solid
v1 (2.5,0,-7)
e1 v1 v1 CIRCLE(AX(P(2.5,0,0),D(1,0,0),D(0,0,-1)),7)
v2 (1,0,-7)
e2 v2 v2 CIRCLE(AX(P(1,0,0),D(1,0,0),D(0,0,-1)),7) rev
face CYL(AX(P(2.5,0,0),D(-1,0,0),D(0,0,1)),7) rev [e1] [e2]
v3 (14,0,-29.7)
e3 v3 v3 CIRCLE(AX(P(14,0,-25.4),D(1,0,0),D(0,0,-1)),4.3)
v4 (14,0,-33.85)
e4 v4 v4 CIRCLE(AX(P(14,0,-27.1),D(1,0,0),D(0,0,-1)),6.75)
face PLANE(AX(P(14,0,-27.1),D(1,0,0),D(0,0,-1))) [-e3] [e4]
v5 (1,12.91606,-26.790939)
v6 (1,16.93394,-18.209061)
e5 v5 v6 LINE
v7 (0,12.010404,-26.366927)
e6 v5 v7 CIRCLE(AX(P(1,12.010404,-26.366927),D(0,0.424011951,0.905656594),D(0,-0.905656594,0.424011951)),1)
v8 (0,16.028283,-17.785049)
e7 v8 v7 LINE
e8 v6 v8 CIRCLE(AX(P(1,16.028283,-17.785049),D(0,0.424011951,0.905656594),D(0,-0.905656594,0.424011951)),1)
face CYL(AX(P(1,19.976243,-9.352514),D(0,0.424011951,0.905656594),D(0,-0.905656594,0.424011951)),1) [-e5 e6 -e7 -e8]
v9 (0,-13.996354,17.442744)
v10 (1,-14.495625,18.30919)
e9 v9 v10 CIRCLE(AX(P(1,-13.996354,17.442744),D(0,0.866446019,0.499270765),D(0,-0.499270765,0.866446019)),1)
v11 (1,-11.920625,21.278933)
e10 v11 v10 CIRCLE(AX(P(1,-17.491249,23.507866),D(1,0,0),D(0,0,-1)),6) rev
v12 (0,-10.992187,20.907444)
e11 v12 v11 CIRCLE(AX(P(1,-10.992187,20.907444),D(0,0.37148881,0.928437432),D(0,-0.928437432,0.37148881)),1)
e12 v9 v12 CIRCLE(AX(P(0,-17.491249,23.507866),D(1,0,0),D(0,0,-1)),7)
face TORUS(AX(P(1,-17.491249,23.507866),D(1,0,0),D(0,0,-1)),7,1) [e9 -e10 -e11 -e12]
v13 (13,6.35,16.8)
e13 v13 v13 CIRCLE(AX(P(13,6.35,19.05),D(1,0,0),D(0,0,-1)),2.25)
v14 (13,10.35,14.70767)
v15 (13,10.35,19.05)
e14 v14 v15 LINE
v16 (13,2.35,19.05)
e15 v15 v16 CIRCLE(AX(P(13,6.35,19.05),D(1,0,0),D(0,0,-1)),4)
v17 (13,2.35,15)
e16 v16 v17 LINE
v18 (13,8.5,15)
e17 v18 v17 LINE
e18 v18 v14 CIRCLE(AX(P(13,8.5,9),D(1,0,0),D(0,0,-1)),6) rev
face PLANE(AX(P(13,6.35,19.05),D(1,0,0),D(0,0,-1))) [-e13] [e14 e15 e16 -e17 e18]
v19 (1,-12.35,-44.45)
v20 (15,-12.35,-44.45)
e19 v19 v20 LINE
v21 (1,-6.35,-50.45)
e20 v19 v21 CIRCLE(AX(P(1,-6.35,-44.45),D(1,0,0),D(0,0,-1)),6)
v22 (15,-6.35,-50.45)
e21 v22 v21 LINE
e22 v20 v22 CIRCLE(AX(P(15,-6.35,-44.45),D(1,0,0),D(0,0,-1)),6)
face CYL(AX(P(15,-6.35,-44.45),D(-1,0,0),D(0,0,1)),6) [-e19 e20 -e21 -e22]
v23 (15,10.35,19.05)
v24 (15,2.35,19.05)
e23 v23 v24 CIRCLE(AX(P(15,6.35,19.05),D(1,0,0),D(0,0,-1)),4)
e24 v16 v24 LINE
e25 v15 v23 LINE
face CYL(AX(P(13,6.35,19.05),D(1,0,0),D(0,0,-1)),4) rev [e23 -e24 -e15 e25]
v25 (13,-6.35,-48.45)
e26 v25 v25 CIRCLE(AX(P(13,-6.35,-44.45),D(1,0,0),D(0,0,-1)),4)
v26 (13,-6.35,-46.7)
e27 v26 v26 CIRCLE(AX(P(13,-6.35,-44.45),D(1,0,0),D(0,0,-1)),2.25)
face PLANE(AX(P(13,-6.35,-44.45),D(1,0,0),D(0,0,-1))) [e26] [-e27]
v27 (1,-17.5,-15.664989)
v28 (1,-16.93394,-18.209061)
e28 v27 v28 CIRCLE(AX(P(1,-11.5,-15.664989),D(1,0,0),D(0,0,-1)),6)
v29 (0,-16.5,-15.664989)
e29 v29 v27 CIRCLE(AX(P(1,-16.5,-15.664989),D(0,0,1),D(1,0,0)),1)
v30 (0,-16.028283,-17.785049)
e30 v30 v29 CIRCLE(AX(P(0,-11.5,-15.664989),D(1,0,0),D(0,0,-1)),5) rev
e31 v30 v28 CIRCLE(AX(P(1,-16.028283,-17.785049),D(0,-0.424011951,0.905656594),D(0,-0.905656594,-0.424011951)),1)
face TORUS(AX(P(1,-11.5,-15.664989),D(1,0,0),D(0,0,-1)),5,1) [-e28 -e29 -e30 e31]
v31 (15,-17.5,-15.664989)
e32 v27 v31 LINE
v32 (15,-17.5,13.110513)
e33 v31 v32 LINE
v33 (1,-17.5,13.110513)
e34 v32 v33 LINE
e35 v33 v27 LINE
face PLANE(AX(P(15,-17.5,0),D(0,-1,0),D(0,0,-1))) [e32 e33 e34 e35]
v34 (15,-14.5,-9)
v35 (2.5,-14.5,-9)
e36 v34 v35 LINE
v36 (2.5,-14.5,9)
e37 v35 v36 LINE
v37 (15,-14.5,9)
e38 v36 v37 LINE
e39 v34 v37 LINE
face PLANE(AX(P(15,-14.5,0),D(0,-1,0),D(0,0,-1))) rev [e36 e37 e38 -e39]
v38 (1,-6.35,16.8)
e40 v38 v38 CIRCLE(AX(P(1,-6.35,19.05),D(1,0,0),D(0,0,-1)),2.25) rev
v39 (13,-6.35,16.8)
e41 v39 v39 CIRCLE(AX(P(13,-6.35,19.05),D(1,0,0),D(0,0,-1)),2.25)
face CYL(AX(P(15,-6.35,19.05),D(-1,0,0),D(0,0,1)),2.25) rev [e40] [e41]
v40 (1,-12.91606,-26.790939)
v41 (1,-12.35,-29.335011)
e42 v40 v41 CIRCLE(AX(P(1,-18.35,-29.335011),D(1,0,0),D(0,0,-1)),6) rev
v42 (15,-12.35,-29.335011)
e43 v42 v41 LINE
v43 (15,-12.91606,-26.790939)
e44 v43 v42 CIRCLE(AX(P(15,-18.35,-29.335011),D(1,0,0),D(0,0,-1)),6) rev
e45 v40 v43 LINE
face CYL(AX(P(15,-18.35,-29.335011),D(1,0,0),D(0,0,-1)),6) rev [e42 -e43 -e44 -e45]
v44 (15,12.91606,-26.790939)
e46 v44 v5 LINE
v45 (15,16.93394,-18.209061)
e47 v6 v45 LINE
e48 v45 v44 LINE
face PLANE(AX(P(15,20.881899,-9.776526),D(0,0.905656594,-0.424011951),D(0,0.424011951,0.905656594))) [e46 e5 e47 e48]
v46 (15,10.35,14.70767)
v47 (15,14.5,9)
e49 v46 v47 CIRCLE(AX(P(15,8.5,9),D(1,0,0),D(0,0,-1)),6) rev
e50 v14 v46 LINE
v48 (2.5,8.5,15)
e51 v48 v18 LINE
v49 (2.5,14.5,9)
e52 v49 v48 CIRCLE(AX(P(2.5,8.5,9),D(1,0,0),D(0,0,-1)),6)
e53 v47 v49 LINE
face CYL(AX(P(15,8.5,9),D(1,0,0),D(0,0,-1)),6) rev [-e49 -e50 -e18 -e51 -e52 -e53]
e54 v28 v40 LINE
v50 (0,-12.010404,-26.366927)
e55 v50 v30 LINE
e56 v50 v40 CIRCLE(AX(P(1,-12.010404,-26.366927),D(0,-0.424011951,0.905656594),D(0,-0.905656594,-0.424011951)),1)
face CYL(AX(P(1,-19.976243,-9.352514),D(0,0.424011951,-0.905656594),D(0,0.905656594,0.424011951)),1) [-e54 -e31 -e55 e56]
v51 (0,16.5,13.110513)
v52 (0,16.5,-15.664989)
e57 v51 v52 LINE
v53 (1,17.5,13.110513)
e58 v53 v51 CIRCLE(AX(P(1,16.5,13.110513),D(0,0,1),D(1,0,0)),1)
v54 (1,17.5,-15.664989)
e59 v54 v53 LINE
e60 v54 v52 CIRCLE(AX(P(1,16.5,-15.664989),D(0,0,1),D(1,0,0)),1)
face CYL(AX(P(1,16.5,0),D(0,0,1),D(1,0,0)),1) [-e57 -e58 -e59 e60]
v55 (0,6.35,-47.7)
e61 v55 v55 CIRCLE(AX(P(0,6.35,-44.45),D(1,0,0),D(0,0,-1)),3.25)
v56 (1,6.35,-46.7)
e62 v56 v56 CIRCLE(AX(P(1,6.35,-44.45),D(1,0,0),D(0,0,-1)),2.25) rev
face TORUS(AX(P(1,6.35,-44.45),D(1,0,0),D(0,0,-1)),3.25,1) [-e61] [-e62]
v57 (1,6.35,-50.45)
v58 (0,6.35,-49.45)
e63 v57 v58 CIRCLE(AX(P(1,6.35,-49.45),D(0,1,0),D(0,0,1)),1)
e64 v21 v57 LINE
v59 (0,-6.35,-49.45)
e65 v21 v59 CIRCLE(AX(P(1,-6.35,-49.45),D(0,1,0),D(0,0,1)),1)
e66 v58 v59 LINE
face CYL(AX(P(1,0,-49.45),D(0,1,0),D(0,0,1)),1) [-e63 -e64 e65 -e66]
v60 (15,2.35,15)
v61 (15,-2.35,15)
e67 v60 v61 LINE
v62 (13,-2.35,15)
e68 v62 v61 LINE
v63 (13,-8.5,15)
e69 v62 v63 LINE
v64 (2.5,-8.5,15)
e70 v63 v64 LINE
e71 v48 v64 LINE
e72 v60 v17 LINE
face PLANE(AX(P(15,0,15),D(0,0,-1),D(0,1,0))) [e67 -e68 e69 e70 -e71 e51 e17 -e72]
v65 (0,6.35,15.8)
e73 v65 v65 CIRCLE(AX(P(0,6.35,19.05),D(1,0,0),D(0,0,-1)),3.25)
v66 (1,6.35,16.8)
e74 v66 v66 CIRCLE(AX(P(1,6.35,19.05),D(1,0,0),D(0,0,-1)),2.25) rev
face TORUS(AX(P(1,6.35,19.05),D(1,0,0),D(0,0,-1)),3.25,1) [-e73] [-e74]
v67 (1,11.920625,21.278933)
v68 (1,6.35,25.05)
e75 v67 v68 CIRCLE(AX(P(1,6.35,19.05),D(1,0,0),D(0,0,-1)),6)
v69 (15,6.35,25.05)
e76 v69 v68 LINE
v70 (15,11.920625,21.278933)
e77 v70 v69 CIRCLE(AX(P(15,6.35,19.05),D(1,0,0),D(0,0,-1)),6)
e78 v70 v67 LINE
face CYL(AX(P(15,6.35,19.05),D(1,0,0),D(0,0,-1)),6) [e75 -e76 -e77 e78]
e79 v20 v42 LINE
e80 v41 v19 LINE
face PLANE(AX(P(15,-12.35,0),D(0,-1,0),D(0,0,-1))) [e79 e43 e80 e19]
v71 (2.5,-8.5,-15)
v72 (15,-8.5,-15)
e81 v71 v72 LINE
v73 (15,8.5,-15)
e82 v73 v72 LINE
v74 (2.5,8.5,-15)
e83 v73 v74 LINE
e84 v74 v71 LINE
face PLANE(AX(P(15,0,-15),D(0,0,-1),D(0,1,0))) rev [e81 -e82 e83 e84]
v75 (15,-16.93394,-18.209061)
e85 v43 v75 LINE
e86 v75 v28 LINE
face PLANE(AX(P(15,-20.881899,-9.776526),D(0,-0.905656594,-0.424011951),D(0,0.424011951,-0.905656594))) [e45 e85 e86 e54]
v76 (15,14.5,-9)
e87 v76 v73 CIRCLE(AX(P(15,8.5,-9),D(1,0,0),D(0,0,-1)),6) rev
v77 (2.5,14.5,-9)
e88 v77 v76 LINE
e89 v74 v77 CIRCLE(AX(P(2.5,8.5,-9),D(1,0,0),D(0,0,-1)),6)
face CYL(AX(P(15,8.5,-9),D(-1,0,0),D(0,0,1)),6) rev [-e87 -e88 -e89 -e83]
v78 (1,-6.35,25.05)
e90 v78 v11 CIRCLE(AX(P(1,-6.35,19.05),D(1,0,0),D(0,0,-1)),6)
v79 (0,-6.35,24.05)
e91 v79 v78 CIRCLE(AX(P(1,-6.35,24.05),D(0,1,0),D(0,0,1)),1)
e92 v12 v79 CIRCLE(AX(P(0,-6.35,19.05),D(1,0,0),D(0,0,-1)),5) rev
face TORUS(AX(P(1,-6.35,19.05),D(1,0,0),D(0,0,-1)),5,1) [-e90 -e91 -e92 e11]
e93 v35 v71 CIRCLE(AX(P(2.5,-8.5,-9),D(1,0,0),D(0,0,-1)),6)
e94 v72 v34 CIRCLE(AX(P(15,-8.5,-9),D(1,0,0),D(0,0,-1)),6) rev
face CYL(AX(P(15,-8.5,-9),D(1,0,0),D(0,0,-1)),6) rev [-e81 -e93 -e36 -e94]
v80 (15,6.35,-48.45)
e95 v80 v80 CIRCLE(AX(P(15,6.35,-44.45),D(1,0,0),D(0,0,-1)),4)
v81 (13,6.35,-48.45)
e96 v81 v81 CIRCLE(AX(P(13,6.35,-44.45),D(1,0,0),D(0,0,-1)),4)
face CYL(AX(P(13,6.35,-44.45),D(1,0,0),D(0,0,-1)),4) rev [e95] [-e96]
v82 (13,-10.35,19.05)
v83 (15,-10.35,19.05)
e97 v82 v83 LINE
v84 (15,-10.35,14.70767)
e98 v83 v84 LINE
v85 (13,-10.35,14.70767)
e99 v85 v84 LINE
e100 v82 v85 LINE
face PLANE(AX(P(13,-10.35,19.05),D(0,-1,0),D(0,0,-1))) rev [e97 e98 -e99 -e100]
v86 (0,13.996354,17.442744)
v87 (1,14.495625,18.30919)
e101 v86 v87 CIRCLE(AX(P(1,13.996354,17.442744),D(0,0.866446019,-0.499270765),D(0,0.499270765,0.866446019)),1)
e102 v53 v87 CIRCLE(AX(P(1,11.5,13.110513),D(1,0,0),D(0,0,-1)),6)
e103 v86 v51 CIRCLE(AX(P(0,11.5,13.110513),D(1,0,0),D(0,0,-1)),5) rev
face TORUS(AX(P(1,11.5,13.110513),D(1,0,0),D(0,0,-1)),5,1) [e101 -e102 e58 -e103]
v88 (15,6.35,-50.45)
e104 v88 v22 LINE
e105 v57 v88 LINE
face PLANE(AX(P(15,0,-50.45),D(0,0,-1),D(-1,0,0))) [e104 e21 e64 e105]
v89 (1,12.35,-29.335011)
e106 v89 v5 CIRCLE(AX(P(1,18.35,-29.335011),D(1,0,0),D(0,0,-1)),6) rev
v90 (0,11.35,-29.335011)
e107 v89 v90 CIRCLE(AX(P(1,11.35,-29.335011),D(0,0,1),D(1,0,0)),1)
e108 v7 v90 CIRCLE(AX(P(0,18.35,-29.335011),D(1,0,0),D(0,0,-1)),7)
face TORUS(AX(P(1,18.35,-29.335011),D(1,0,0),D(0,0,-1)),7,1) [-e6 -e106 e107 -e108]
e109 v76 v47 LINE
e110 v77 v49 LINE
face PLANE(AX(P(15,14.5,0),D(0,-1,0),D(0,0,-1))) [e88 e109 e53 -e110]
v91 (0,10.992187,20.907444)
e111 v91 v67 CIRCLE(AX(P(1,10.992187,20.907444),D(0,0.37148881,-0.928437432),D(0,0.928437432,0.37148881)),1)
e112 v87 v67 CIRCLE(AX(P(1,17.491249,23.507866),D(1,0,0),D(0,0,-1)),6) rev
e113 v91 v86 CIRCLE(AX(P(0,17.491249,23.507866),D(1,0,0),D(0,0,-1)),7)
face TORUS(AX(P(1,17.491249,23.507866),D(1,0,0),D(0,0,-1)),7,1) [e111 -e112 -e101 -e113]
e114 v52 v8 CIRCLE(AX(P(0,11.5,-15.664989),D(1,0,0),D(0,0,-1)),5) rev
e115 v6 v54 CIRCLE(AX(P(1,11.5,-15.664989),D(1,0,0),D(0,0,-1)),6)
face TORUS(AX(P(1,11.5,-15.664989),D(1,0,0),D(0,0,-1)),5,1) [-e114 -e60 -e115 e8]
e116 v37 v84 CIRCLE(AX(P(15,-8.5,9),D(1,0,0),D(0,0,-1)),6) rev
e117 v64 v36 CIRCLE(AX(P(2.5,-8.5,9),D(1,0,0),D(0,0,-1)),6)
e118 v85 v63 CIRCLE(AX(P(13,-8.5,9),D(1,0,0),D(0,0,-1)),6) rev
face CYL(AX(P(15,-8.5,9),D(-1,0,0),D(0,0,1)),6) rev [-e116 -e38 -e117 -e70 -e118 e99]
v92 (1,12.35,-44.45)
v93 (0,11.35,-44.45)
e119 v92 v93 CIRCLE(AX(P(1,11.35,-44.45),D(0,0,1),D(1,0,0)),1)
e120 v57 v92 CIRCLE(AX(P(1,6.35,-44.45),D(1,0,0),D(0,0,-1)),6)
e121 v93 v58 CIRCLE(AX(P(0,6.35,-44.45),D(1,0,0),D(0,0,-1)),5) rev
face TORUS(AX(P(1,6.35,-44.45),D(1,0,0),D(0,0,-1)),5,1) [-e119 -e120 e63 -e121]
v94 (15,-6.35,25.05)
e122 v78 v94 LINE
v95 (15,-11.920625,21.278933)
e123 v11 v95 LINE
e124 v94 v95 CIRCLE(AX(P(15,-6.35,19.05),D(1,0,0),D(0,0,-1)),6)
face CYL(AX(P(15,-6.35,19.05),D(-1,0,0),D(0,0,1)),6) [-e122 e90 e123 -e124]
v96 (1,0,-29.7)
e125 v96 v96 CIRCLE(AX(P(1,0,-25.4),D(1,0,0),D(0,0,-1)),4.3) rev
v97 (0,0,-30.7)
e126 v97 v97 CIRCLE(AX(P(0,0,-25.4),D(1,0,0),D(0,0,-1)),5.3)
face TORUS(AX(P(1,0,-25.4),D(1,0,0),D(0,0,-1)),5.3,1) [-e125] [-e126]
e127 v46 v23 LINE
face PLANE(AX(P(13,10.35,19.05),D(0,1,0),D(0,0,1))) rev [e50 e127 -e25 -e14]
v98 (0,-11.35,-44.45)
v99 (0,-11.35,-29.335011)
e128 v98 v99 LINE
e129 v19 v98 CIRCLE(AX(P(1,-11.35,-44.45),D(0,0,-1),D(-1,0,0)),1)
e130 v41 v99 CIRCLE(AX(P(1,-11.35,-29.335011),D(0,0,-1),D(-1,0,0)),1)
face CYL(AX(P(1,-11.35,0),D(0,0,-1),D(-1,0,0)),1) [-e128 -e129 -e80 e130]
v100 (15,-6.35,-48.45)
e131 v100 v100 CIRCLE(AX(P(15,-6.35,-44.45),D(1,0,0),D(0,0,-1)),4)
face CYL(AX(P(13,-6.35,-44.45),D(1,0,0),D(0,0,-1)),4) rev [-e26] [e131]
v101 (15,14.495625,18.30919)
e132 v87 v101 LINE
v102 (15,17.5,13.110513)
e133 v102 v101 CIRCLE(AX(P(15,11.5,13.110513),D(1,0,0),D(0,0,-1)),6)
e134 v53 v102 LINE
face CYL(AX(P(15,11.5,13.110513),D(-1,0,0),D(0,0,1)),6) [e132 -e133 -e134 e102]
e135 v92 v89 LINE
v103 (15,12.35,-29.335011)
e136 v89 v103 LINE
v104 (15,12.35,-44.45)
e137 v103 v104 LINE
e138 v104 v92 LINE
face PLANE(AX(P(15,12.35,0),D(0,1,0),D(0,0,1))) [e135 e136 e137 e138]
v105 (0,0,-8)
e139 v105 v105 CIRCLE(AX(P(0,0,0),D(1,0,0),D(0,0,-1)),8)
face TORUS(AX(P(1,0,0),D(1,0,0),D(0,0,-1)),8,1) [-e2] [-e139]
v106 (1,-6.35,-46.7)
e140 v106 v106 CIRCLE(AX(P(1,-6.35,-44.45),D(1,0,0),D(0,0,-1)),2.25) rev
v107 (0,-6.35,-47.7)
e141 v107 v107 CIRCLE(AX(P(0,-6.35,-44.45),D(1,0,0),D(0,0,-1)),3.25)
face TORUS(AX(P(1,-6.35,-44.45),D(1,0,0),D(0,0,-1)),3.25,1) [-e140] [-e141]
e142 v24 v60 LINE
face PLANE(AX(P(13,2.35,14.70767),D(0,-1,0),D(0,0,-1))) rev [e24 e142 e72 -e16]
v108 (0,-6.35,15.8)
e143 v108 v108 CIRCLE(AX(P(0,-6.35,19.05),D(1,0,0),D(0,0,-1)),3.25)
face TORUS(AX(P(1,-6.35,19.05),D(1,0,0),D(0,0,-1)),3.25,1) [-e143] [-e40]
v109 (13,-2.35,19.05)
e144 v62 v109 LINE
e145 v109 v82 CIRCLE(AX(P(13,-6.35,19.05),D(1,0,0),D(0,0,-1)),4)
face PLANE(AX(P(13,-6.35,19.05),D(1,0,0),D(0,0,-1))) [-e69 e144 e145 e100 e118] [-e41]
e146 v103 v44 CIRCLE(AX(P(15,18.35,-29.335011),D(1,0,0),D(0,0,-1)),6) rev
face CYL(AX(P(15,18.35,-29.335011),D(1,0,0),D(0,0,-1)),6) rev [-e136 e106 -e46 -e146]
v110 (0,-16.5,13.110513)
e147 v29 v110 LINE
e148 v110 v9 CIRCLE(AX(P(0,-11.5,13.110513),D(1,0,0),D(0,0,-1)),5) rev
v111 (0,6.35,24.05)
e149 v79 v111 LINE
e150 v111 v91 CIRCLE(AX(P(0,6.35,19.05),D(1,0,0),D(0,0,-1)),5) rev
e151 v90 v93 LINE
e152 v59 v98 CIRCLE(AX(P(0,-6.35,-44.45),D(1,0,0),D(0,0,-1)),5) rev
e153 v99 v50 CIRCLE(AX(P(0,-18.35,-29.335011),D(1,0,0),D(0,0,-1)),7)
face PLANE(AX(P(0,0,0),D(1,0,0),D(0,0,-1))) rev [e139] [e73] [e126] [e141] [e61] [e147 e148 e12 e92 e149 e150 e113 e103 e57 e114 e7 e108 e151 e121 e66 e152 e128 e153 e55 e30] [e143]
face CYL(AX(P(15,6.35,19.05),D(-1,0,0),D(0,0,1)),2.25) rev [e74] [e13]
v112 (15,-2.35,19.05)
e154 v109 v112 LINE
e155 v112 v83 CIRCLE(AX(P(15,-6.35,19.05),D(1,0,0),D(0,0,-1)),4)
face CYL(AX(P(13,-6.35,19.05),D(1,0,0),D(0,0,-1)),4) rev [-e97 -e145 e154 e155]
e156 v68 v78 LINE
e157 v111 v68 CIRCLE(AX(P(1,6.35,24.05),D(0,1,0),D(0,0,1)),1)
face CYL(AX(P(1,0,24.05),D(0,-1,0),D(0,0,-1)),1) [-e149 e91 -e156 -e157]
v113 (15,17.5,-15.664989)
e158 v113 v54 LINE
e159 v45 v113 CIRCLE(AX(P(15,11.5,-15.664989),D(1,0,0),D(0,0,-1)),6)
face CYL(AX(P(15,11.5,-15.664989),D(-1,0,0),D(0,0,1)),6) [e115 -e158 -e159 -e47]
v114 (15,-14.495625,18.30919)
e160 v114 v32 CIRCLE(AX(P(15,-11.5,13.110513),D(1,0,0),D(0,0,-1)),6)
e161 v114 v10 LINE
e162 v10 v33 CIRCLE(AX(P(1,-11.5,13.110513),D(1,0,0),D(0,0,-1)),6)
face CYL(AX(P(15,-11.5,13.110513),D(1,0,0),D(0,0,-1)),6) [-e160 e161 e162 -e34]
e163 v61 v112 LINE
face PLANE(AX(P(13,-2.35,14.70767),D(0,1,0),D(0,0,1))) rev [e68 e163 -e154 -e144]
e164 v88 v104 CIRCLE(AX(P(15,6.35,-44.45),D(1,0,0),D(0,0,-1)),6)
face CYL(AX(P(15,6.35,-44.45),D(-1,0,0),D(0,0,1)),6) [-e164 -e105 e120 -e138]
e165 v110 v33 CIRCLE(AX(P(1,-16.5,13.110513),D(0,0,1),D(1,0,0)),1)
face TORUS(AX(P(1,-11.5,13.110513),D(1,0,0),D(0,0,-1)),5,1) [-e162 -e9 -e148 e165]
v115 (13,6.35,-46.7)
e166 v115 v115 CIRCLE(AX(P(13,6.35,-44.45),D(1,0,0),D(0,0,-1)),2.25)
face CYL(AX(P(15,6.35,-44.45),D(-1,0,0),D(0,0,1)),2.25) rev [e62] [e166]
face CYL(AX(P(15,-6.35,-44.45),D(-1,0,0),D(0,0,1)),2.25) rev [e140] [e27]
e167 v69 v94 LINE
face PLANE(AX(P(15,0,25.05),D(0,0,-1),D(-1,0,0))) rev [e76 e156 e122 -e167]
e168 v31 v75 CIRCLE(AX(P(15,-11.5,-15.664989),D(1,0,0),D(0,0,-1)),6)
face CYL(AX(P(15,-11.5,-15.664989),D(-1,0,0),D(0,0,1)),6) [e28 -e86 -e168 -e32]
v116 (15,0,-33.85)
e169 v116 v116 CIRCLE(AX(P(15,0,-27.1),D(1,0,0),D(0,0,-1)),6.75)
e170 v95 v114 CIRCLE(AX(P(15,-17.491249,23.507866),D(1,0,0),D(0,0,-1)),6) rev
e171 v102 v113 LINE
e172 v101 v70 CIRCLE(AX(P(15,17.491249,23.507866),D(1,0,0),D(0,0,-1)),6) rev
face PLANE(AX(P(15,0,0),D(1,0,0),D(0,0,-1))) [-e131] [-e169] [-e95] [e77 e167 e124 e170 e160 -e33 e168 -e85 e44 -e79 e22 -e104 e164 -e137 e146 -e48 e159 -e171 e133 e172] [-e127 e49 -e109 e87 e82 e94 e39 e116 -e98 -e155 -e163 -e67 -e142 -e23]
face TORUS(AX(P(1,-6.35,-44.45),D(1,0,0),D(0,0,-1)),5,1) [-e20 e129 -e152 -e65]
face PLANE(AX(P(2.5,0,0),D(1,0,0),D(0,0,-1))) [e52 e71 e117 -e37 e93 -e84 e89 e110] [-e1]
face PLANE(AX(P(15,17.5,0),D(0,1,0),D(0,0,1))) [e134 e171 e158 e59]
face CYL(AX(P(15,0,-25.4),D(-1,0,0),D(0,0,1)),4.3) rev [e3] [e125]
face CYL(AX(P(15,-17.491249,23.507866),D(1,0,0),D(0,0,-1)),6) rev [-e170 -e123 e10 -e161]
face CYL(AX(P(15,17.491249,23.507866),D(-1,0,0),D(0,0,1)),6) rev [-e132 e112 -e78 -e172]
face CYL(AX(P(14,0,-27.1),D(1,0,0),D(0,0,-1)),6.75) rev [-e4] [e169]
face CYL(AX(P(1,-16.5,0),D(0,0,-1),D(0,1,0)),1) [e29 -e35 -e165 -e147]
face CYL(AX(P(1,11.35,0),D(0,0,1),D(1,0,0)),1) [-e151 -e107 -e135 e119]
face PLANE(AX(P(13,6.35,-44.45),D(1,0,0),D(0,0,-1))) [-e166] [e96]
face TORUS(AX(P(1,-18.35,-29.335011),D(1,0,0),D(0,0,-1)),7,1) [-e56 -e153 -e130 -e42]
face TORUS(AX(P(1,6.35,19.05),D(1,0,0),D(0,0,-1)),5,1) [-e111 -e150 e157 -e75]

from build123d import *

# Parameters (mm, degrees)
SKETCH1_R           = 4.3
SKETCH1_R_2         = 2.25
SKETCH1_W           = 30
SKETCH1_H           = 29
BOSS_EXTRUDE1_DEPTH = 15
SKETCH1_3_W         = 30
SKETCH1_3_H         = 29
SKETCH1_3_R         = 7
BOSS_EXTRUDE2_DEPTH = 2.5
CUT_EXTRUDE1_START  = 14
SKETCH1_4_R         = 6.75
SKETCH1_4_R_2       = 4.3
CUT_EXTRUDE1_DEPTH  = 1
FILLET1_R           = 6
FILLET2_R           = 6
FILLET3_R           = 1
SKETCH2_R           = 4
CUT_EXTRUDE2_DEPTH  = 2


with BuildPart() as part:
    # Sketch1 → Boss-Extrude1 (new body)
    with BuildSketch(Plane(origin=(0, 0, 0), x_dir=(0, 0, -1), z_dir=(1, 0, 0))):
        Polygon((-19.05, 17.5), (17, 17.5), (28, 12.35), (50.45, 12.35), (50.45, -12.35), (28, -12.35), (17, -17.5), (-19.05, -17.5), (-19.05, -12.35), (-25.05, -12.35), (-25.05, 12.35), (-19.05, 12.35), align=None)
        with Locations((25.4, 0)):
            Circle(SKETCH1_R, mode=Mode.SUBTRACT)
        with Locations((-19.05, 6.35)):
            Circle(SKETCH1_R_2, mode=Mode.SUBTRACT)
        with Locations((44.45, 6.35)):
            Circle(SKETCH1_R_2, mode=Mode.SUBTRACT)
        with Locations((44.45, -6.35)):
            Circle(SKETCH1_R_2, mode=Mode.SUBTRACT)
        with Locations((-19.05, -6.35)):
            Circle(SKETCH1_R_2, mode=Mode.SUBTRACT)
        Rectangle(SKETCH1_W, SKETCH1_H, mode=Mode.SUBTRACT)
    extrude(amount=BOSS_EXTRUDE1_DEPTH)

    # Sketch1<3> → Boss-Extrude2 (add)
    with BuildSketch(Plane(origin=(0, 0, 0), x_dir=(0, 0, -1), z_dir=(1, 0, 0))):
        Rectangle(SKETCH1_3_W, SKETCH1_3_H)
        Circle(SKETCH1_3_R, mode=Mode.SUBTRACT)
    extrude(amount=BOSS_EXTRUDE2_DEPTH)

    # Sketch1<4> → Cut-Extrude1 (cut)
    with BuildSketch(Plane(origin=(0, 0, 0), x_dir=(0, 0, -1), z_dir=(1, 0, 0)).offset(CUT_EXTRUDE1_START)):
        with Locations((27.1, 0)):
            Circle(SKETCH1_4_R)
        with Locations((25.4, 0)):
            Circle(SKETCH1_4_R_2, mode=Mode.SUBTRACT)
    extrude(amount=CUT_EXTRUDE1_DEPTH, mode=Mode.SUBTRACT)

    # Fillet1
    # the kernel refuses this fillet: 6 mm, written as the material it adds along each edge
    with BuildSketch(Plane(origin=(2.5, -14.5, 15), x_dir=(0, 1, 0), z_dir=(1, 0, 0)), Plane(origin=(2.5, 14.5, 15), x_dir=(0, 0, -1), z_dir=(1, 0, 0))) as fillet1_piece_1:
        with BuildLine():
            CenterArc((FILLET1_R, -FILLET1_R), FILLET1_R, 90, 90)
            Line((0, -FILLET1_R), (0, 0))
            Line((0, 0), (FILLET1_R, 0))
        make_face()
    extrude(amount=12.5)
    with BuildSketch(Plane(origin=(2.5, -14.5, -15), x_dir=(0, 1, 0), z_dir=(1, 0, 0)), Plane(origin=(2.5, 14.5, -15), x_dir=(0, 0, 1), z_dir=(1, 0, 0))) as fillet1_piece_2:
        with BuildLine():
            CenterArc((FILLET1_R, FILLET1_R), FILLET1_R, 180, 90)
            Line((0, FILLET1_R), (0, 0))
            Line((0, 0), (FILLET1_R, 0))
        make_face()
    extrude(amount=12.5)
    with BuildSketch(Plane(origin=(0, -12.35, -28), x_dir=(0, 0, -1), z_dir=(1, 0, 0)), Plane(origin=(0, 12.35, -28), x_dir=(0, 0.42401195067886216, 0.9056565936830063), z_dir=(1, 0, 0))) as fillet1_piece_3:
        with BuildLine():
            CenterArc((FILLET1_R * 0.222501762429, -FILLET1_R), FILLET1_R, 90, 25.088139126)
            Line((-FILLET1_R * 0.20151018825, -FILLET1_R * 0.094343406317), (0, 0))
            Line((0, 0), (FILLET1_R * 0.222501762429, 0))
        make_face()
    extrude(amount=15)
    # the kernel refuses this fillet: 6 mm, written as the material it takes off along each edge
    with BuildSketch(Plane(origin=(-3.337526436, 17.5, -17), x_dir=(0, 0, 1), z_dir=(1, 0, 0)), Plane(origin=(-3.337526436, -17.5, -17), x_dir=(0, 0.4240119506788633, -0.9056565936830059), z_dir=(1, 0, 0))) as fillet1_2_piece_1:
        with BuildLine():
            CenterArc((FILLET1_R * 0.222501762429, FILLET1_R), FILLET1_R, 244.911860874, 25.088139126)
            Line((-FILLET1_R * 0.20151018825, FILLET1_R * 0.094343406317), (0, 0))
            Line((0, 0), (FILLET1_R * 0.222501762429, 0))
        make_face()
    extrude(amount=21.675052873, mode=Mode.SUBTRACT)
    with BuildSketch(Plane(origin=(-14.848716274, -17.5, 19.05), x_dir=(0, 0, -1), z_dir=(1, 0, 0))) as fillet1_2_piece_2:
        with BuildLine():
            CenterArc((5.93948651, 6), FILLET1_R, 188.144300554, 81.855699446)
            Line((0, 5.15), (0, 0))
            Line((0, 0), (5.93948651, 0))
        make_face()
    extrude(amount=44.697432549, mode=Mode.SUBTRACT)
    with BuildSketch(Plane(origin=(-14.848716274, 17.5, 19.05), x_dir=(0, 0, -1), z_dir=(1, 0, 0))) as fillet1_2_piece_3:
        with BuildLine():
            CenterArc((5.93948651, -6), FILLET1_R, 90, 81.855699446)
            Line((0, -5.15), (0, 0))
            Line((0, 0), (5.93948651, 0))
        make_face()
    extrude(amount=44.697432549, mode=Mode.SUBTRACT)
    with BuildSketch(Plane(origin=(-15, -12.35, 25.05), x_dir=(0, 0, -1), z_dir=(1, 0, 0)), Plane(origin=(-15, -12.35, -50.45), x_dir=(0, 1, 0), z_dir=(1, 0, 0)), Plane(origin=(-15, 12.35, -50.45), x_dir=(0, 0, 1), z_dir=(1, 0, 0))) as fillet1_2_piece_4:
        with BuildLine():
            CenterArc((FILLET1_R, FILLET1_R), FILLET1_R, 180, 90)
            Line((0, FILLET1_R), (0, 0))
            Line((0, 0), (FILLET1_R, 0))
        make_face()
    extrude(amount=45, mode=Mode.SUBTRACT)
    with BuildSketch(Plane(origin=(-15, 12.35, 25.05), x_dir=(0, 0, -1), z_dir=(1, 0, 0))) as fillet1_2_piece_5:
        with BuildLine():
            CenterArc((FILLET1_R, -FILLET1_R), FILLET1_R, 90, 90)
            Line((0, -FILLET1_R), (0, 0))
            Line((0, 0), (FILLET1_R, 0))
        make_face()
    extrude(amount=45, mode=Mode.SUBTRACT)

    # Fillet2
    fillet2_edges = [part.edges().sort_by_distance(p)[0] for p in [
        (7.5, -12.35, 19.05),
        (7.5, 12.35, 19.05),
    ]]
    fillet(fillet2_edges, radius=FILLET2_R)

    # Fillet3
    fillet3_edges = [part.edges().sort_by_distance(p)[0] for p in [
        (0, -12.35, -36.892505287),
        (0, -14.925, -22.5),
        (0, 14.925, -22.5),
        (0, 12.35, -36.892505287),
        (0, 17.5, -1.277237968),
        (0, 0, 25.05),
        (0, 0, -50.45),
        (0, -17.5, -1.277237968),
        (0, 10.592640687, -48.692640687),
        (0, -10.592640687, -48.692640687),
        (0, 9.713510284, 24.018581143),
        (0, -16.694889197, 16.112700398),
        (0, -17.356775451, -16.968132285),
        (0, 17.356775451, -16.968132285),
        (0, -12.493224549, -28.031867715),
        (0, 12.493224549, -28.031867715),
        (0, -9.713510284, 24.018581143),
        (0, 16.694889197, 16.112700398),
        (0, -12.958038397, 19.577216913),
        (0, 12.958038397, 19.577216913),
        (0, 0, -21.1),
        (0, 6.35, 21.3),
        (0, 6.35, -42.2),
        (0, -6.35, -42.2),
        (0, -6.35, 21.3),
        (0, 0, 7),
    ]]
    fillet(fillet3_edges, radius=FILLET3_R)

    # Sketch2 → Cut-Extrude2 (cut)
    with BuildSketch(Plane(origin=(15, 0, 0), x_dir=(0, 0, -1), z_dir=(1, 0, 0))):
        with Locations((44.45, -6.35)):
            Circle(SKETCH2_R)
        with Locations((44.45, 6.35)):
            Circle(SKETCH2_R)
        with BuildLine():
            Line((-19.05, 10.35), (-14.707670278, 10.35))
            Line((-14.707670278, 10.35), (-14.707670278, 2.35))
            Line((-14.707670278, 2.35), (-19.05, 2.35))
            ThreePointArc((-19.05, 2.35), (-23.05, 6.35), (-19.05, 10.35))
        make_face()
        with BuildLine():
            Line((-19.05, -10.35), (-14.707670278, -10.35))
            Line((-14.707670278, -10.35), (-14.707670278, -2.35))
            Line((-14.707670278, -2.35), (-19.05, -2.35))
            ThreePointArc((-19.05, -2.35), (-23.05, -6.35), (-19.05, -10.35))
        make_face()
    extrude(amount=-CUT_EXTRUDE2_DEPTH, mode=Mode.SUBTRACT)


solid = part.part
